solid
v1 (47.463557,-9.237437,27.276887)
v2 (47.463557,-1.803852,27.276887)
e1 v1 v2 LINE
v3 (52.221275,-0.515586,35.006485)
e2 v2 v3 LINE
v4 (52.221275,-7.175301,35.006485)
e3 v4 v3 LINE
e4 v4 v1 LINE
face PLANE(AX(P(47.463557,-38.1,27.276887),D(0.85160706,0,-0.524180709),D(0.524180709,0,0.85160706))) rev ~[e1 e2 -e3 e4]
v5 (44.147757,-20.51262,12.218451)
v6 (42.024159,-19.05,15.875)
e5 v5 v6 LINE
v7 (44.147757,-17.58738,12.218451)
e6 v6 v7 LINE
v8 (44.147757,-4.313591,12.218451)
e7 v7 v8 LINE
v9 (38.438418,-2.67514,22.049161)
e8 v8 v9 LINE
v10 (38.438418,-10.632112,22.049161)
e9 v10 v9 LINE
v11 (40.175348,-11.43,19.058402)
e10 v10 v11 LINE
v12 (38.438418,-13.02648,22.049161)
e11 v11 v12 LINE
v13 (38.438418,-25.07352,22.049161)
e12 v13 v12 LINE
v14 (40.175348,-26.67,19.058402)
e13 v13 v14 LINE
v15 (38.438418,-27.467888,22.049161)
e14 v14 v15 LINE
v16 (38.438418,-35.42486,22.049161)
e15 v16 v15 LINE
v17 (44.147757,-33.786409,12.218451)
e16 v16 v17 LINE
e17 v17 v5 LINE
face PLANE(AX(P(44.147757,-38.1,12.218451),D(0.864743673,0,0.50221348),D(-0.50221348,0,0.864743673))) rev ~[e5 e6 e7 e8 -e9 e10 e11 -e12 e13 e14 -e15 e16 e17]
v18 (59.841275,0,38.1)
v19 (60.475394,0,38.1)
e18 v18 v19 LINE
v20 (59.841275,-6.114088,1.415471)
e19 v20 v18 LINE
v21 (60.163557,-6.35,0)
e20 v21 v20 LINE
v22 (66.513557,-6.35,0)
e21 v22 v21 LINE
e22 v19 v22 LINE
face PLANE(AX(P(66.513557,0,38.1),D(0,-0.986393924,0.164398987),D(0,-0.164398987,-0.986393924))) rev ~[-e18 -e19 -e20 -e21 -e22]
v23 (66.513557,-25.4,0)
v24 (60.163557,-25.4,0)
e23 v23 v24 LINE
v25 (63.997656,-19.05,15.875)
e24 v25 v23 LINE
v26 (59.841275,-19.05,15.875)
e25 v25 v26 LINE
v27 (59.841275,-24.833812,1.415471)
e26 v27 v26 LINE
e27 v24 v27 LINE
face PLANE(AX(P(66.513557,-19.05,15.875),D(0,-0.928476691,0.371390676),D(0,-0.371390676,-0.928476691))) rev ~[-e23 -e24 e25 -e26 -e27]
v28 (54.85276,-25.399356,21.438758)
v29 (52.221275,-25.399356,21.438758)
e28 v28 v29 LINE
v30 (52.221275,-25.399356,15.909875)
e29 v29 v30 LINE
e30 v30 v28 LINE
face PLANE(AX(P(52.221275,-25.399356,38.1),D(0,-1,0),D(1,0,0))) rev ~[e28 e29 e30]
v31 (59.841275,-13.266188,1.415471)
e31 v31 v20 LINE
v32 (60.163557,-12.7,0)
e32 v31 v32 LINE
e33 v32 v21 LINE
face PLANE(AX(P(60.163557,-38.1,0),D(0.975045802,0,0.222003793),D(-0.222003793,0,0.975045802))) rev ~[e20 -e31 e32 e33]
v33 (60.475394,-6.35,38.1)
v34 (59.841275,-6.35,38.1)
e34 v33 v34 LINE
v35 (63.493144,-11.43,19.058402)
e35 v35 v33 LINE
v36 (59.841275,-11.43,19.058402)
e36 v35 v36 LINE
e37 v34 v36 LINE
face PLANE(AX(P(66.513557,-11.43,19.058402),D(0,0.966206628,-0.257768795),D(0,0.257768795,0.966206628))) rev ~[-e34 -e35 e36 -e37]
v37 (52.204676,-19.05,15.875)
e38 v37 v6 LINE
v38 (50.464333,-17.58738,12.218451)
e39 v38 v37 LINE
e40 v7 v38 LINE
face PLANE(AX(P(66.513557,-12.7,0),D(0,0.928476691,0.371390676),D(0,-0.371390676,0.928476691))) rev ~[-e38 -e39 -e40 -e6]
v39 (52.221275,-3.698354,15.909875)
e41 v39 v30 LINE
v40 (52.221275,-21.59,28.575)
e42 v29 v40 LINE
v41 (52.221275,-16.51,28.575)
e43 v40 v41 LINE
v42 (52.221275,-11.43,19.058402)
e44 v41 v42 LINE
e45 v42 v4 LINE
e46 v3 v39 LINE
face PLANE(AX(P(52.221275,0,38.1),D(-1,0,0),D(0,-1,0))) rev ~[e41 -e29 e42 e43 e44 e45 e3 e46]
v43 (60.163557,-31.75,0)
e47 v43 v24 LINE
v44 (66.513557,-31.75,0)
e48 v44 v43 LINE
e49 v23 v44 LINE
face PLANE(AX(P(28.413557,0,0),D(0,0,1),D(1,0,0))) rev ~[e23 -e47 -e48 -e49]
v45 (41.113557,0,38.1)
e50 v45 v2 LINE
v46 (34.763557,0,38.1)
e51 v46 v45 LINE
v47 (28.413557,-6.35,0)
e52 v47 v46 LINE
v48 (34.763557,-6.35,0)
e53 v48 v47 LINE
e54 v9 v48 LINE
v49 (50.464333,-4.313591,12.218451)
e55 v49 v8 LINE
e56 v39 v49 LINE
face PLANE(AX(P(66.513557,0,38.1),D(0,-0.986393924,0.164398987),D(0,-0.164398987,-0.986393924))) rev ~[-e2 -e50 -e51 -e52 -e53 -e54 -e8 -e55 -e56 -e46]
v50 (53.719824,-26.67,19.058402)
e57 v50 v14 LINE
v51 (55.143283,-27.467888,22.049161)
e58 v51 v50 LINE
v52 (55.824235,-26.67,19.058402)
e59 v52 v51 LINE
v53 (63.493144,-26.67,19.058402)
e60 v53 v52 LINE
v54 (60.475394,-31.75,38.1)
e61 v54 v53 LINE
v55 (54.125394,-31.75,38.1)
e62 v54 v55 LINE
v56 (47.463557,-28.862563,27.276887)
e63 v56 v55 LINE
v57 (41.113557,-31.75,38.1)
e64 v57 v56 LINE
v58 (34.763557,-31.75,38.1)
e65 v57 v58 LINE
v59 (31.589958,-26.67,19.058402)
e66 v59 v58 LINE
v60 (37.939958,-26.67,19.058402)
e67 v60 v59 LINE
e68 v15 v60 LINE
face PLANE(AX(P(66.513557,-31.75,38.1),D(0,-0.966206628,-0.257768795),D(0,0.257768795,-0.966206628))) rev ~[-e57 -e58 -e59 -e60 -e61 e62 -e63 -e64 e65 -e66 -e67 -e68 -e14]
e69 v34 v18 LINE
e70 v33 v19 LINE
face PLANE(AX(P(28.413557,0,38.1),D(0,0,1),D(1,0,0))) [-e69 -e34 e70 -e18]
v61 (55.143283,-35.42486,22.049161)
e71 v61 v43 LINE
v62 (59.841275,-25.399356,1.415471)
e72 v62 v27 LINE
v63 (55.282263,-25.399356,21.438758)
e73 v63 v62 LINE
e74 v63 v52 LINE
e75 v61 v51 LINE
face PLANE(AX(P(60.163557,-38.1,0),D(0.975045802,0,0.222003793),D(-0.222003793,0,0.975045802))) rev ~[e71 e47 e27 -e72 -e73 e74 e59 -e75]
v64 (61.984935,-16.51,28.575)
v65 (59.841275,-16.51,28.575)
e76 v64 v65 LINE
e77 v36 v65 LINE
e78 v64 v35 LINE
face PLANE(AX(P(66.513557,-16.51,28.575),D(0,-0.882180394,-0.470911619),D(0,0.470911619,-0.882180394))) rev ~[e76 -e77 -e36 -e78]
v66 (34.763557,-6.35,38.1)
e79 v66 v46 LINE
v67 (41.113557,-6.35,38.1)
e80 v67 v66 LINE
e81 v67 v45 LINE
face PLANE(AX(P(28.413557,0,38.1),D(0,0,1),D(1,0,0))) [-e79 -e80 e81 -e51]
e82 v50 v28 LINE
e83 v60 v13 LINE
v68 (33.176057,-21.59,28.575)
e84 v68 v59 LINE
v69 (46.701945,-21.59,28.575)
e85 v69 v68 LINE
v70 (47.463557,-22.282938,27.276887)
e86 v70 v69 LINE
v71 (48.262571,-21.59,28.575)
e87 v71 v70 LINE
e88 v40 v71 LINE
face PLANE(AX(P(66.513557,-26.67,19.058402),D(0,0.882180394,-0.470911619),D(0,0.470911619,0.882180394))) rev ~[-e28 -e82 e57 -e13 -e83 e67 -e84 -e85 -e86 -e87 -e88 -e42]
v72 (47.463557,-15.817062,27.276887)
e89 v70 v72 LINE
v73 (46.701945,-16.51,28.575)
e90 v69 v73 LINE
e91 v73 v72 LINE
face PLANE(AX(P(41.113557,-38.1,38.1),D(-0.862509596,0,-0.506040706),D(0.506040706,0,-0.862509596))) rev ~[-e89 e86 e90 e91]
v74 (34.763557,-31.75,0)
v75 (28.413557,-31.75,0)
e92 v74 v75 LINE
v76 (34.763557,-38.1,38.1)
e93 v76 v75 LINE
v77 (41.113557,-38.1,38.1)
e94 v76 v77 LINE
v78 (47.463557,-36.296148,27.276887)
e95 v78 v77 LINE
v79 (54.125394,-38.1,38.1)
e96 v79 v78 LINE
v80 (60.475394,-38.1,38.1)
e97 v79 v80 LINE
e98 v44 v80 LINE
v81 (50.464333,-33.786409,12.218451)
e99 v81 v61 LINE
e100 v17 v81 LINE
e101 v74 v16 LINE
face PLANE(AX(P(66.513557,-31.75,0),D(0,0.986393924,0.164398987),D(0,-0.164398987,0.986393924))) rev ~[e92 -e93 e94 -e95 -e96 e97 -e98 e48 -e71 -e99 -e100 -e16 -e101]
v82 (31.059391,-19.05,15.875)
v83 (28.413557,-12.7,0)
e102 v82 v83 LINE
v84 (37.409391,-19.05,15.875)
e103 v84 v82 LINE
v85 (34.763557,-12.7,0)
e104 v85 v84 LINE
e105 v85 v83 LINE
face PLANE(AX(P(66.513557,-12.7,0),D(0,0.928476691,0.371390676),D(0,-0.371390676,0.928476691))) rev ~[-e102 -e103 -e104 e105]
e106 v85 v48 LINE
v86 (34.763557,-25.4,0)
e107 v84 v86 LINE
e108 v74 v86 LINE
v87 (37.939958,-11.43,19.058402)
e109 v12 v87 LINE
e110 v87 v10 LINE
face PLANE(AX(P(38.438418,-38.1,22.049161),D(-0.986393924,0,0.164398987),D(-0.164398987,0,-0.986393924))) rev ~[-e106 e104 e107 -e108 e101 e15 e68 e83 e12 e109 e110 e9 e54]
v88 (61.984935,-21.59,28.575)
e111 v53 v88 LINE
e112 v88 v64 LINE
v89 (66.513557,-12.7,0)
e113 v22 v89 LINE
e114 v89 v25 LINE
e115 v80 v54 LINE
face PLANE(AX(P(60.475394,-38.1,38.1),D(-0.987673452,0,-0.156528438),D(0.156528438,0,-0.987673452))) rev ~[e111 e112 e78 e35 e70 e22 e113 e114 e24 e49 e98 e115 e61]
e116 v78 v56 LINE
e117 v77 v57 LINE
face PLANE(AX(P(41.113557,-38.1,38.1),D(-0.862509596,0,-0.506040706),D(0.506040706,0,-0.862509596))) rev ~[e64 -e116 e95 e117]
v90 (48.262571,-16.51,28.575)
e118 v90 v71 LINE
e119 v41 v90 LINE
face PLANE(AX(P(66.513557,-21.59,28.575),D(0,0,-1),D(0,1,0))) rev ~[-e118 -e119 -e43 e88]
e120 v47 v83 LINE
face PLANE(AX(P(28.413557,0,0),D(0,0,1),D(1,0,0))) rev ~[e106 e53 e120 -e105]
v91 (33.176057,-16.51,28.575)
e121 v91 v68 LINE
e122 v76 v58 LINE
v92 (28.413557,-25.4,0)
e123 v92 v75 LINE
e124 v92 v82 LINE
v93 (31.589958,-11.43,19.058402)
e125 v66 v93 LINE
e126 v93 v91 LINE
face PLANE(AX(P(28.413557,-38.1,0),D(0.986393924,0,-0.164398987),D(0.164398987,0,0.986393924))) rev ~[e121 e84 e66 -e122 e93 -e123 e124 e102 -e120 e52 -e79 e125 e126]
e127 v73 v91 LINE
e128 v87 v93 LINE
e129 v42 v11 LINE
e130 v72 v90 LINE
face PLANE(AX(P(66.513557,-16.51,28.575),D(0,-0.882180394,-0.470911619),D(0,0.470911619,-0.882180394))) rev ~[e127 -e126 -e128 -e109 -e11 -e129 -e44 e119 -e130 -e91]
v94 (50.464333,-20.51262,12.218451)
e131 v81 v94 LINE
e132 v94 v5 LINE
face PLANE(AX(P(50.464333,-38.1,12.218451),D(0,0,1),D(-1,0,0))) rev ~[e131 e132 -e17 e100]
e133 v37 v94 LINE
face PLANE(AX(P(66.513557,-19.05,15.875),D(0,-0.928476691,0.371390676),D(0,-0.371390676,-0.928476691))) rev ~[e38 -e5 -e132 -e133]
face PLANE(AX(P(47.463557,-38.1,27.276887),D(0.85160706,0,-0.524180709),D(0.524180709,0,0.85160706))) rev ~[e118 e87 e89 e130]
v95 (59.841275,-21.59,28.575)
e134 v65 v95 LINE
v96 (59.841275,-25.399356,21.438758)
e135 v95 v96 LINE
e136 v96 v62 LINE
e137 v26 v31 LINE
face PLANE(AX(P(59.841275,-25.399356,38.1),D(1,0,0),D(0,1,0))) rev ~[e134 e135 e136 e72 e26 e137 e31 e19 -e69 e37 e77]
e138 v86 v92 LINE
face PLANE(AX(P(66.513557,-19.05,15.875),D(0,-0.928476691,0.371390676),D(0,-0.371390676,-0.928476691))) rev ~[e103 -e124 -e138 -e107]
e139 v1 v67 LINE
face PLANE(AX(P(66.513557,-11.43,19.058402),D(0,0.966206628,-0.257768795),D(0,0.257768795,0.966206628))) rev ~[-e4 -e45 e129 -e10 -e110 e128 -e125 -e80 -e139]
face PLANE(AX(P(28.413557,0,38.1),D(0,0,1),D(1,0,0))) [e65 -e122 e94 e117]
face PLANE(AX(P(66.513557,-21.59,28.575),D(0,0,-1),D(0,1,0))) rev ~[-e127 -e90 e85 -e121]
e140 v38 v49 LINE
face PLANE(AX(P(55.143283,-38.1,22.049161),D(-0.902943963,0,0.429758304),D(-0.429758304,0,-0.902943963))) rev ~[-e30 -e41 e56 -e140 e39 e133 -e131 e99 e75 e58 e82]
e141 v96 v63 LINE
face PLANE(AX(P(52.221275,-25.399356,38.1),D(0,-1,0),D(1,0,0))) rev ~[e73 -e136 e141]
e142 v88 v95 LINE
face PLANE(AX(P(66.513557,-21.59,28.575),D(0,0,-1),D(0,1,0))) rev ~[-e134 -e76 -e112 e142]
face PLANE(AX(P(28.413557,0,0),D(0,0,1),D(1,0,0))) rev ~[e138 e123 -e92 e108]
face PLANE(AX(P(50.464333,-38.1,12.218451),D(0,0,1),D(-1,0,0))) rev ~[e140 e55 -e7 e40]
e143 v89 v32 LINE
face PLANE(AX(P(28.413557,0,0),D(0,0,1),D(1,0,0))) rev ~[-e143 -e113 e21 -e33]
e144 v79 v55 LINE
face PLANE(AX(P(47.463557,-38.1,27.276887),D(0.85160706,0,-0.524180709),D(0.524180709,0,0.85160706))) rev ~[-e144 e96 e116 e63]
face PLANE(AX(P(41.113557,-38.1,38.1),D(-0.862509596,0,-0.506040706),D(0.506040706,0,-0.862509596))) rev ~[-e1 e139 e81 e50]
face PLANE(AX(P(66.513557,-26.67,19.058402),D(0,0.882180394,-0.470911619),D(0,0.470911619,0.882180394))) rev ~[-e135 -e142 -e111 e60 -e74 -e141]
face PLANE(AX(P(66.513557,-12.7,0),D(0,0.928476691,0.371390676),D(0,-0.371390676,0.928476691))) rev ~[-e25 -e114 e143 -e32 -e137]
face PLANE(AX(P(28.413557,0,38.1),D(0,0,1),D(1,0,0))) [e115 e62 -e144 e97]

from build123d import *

# Parameters (mm, degrees)
F0_W     = 38.1
F0_H     = 38.1
F1_DEPTH = 38.1
F5_DEPTH = 38.1
F7_DEPTH = 38.1
F9_DEPTH = 38.1


with BuildPart() as f1:
    # F0 (on Front) → F1 (new body)
    with BuildSketch(Plane.XZ):
        with Locations((47.4635573444, 19.05)):
            Rectangle(F0_W, F0_H)
    extrude(amount=F1_DEPTH)

    # F4 (on face) → F5 (cut)
    with BuildSketch(Plane.YZ.offset(66.5135573444)):
        Polygon((-31.75, 0), (-38.1, 38.1), (-38.1, 0), align=None)
        Polygon((-6.35, 38.1), (-31.75, 38.1), (-26.67, 19.0584023679), (-21.59, 28.575), (-16.51, 28.575), (-11.43, 19.0584023679), align=None)
        Polygon((0, 0), (0, 38.1), (-6.35, 0), align=None)
        Polygon((-19.05, 15.875), (-25.4, 0), (-12.7, 0), align=None)
    extrude(amount=-F5_DEPTH, mode=Mode.SUBTRACT)

    # F6 (on offset) → F7 (cut)
    with BuildSketch(Plane.XZ.offset(38.1)):
        Polygon((38.4384175691, 22.0491613483), (34.7635573444, 0), (60.1635573444, 0), (55.1432829689, 22.0491613483), (50.4643332552, 12.2184510259), (44.1477571021, 12.2184510259), align=None)
        Polygon((34.7635573444, 38.1), (28.4135573444, 38.1), (28.4135573444, 0), align=None)
        Polygon((54.1253941298, 38.1), (41.1135573444, 38.1), (47.4635573444, 27.2768866271), align=None)
        Polygon((60.4753941298, 38.1), (66.5135573444, 0), (66.5135573444, 38.1), align=None)
    extrude(amount=-F7_DEPTH, mode=Mode.SUBTRACT)

    # F8 (on offset) → F9 (cut)
    with BuildSketch(Plane.XY.offset(38.1)):
        Polygon((59.8412752151, 0), (52.2212752151, 0), (52.2212752151, -12.7), (52.2212752151, -25.3993560767), (59.8412752151, -25.3993560767), (59.8412752151, -12.6993560767), align=None)
    extrude(amount=-F9_DEPTH, mode=Mode.SUBTRACT)


solid = f1.part
